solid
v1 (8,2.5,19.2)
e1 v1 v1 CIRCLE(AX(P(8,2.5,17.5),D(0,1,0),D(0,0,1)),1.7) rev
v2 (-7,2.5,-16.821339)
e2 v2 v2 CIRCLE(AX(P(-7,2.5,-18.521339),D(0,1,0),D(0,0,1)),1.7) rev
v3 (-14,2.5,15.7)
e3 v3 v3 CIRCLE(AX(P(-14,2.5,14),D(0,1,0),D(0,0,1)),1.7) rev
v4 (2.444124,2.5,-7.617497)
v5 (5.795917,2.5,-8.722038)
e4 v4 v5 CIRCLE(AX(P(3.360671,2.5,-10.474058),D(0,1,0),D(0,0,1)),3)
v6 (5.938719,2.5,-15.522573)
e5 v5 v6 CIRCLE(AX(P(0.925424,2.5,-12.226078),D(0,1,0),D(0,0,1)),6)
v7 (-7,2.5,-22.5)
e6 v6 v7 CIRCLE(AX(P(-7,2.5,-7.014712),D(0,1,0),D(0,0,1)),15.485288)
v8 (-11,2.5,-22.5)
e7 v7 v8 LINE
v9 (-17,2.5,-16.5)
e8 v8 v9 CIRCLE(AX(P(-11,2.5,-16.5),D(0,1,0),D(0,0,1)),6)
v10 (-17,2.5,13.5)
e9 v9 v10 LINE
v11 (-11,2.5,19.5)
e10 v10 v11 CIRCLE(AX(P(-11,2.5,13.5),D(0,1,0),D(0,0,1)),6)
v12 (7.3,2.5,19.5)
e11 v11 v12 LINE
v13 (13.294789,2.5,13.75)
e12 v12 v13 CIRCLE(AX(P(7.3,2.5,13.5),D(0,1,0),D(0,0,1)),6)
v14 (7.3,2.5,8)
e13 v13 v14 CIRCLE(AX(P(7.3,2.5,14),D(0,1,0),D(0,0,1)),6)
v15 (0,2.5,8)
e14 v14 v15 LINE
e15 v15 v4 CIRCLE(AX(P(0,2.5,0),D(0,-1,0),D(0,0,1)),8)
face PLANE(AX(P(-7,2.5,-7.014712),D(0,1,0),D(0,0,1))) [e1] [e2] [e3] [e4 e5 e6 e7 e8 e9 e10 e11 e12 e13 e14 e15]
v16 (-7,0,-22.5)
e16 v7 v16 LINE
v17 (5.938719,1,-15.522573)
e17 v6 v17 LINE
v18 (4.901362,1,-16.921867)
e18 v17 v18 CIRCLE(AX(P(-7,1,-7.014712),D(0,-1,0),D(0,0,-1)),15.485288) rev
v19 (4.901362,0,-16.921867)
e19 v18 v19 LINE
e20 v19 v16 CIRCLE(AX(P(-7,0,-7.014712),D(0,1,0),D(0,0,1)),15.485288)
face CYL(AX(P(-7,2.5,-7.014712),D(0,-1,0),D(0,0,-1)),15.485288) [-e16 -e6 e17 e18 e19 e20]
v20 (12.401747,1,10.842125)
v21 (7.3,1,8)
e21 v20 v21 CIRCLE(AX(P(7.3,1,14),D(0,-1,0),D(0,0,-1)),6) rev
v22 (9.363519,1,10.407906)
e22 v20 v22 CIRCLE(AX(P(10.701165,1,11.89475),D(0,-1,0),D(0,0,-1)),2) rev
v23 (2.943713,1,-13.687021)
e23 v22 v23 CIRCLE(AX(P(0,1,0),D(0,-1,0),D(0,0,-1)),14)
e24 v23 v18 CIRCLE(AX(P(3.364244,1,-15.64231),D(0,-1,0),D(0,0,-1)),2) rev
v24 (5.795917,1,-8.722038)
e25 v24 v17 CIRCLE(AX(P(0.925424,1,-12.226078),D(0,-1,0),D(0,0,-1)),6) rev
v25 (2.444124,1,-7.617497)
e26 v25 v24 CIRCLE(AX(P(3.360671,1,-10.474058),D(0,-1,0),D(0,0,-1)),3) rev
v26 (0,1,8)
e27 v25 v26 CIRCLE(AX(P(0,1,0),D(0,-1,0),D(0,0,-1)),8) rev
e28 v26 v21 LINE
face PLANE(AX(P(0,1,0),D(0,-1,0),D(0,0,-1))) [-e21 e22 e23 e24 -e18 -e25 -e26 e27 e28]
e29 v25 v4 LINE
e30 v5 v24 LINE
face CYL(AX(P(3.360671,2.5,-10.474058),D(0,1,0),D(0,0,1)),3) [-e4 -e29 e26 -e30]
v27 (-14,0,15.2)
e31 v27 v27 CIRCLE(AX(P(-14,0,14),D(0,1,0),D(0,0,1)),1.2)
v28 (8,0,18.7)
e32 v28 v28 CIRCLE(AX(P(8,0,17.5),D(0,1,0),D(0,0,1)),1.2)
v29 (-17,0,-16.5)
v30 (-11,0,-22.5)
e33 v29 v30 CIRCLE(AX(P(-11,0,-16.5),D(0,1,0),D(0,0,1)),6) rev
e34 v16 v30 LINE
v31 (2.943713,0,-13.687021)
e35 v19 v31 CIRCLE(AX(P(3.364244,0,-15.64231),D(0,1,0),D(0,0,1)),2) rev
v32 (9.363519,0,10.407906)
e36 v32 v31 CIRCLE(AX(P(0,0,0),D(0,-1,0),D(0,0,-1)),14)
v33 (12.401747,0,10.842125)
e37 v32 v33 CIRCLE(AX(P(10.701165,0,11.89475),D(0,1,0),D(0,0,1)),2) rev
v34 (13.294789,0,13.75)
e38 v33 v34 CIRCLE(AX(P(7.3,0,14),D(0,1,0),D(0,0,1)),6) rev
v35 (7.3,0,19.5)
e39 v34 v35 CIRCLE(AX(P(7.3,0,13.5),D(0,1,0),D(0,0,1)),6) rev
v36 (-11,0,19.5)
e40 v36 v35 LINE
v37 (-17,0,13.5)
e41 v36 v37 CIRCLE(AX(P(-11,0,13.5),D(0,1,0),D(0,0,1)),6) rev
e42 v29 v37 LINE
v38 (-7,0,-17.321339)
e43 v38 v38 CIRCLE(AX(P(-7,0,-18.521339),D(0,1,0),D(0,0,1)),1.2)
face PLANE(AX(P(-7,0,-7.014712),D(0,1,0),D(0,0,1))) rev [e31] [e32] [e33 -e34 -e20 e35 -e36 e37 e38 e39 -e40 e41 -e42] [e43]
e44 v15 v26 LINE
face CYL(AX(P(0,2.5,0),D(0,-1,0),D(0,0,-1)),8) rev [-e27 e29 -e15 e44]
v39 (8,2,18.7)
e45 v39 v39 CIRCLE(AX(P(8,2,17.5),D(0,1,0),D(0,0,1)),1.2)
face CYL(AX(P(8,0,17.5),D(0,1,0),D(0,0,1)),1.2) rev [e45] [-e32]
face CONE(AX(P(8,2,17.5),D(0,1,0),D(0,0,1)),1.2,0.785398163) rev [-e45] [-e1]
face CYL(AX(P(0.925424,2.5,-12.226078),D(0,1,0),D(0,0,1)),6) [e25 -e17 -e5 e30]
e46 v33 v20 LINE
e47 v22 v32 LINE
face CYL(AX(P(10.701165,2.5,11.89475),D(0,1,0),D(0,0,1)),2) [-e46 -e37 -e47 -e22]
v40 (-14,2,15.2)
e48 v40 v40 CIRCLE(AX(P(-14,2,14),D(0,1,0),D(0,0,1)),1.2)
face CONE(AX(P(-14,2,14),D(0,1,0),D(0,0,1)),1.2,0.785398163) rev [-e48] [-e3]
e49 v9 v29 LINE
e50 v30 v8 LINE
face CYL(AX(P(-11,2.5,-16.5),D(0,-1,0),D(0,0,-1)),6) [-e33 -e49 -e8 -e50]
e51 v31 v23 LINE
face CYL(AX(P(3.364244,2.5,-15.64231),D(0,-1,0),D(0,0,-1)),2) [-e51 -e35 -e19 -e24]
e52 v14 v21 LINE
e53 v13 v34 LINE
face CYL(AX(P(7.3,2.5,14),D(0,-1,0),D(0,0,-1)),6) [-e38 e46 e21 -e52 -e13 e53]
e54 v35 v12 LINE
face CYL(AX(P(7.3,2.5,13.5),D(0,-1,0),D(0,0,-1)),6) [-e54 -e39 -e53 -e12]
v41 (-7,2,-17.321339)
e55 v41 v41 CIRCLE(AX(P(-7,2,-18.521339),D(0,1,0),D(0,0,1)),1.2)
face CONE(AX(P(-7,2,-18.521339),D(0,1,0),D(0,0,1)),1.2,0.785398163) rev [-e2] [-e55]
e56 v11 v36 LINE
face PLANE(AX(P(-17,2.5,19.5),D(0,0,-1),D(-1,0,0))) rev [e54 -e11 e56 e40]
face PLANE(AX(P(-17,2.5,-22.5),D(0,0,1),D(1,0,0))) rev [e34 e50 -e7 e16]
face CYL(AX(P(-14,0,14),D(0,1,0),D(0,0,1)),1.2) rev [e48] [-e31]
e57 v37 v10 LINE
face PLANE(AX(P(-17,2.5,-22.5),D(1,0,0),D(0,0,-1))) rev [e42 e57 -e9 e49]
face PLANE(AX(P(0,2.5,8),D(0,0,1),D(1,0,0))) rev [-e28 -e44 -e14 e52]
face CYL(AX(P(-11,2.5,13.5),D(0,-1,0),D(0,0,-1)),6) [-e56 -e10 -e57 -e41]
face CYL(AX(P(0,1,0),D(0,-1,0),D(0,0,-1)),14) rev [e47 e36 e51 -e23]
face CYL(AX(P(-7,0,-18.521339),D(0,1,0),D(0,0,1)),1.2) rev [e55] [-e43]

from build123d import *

# Parameters (mm, degrees)
BOSS_EXTRU_1_DEPTH      = 2.5
ESQUISSE2_R             = 1.2
ENL_V_MAT_EXTRU_1_DEPTH = 29.310775334
CONG_1_R                = 6
CONG_3_R                = 3
ESQUISSE4_R             = 14
ENL_V_MAT_EXTRU_2_DEPTH = 1
CONG_5_R                = 2
CHANFREIN1_SIZE         = 0.5


with BuildPart() as part:
    # Esquisse1 → Boss.-Extru.1 (new body)
    with BuildSketch(Plane(origin=(0, 0, 0), x_dir=(1, 0, 0), z_dir=(0, 1, 0))):
        with BuildLine():
            Line((-17, 22.5), (-17, -19.5))
            Line((-17, -19.5), (13.3, -19.5))
            Line((13.3, -19.5), (13.3, -8))
            Line((13.3, -8), (0, -8))
            ThreePointArc((0, -8), (-7.745966692, 2), (3.872983346, 7))
            Line((3.872983346, 7), (8.485281374, 7))
            ThreePointArc((8.485281374, 7), (3.954952524, 17.959261462), (-7, 22.5))
            Line((-7, 22.5), (-17, 22.5))
        make_face()
    extrude(amount=BOSS_EXTRU_1_DEPTH)

    # Esquisse2 → Enlèv. mat.-Extru.1 (cut, through all)
    with BuildSketch(Plane(origin=(0, 2.5, 0), x_dir=(1, 0, 0), z_dir=(0, 1, 0))):
        with Locations(Location((-14, -14, 0), (0, 0, 270))):
            Circle(ESQUISSE2_R)
        with Locations(Location((-7, 18.521339044, 0), (0, 0, 270))):
            Circle(ESQUISSE2_R)
        with Locations(Location((8, -17.5, 0), (0, 0, 270))):
            Circle(ESQUISSE2_R)
    extrude(amount=-ENL_V_MAT_EXTRU_1_DEPTH, mode=Mode.SUBTRACT)

    # Congé1
    # the kernel refuses this fillet: 6 mm, written as the material it takes off along each edge
    with BuildSketch(Plane(origin=(-17, -15, -22.5), x_dir=(0, 0, 1), z_dir=(0, 1, 0))) as cong_1_piece_1:
        with BuildLine():
            CenterArc((CONG_1_R, CONG_1_R), CONG_1_R, 180, 90)
            Line((0, CONG_1_R), (-CONG_1_R * 0.02, CONG_1_R))
            Line((-CONG_1_R * 0.02, CONG_1_R), (-CONG_1_R * 0.02, -CONG_1_R * 0.02))
            Line((-CONG_1_R * 0.02, -CONG_1_R * 0.02), (CONG_1_R, -CONG_1_R * 0.02))
            Line((CONG_1_R, -CONG_1_R * 0.02), (CONG_1_R, 0))
        make_face()
    extrude(amount=32.5, mode=Mode.SUBTRACT)
    with BuildSketch(Plane(origin=(-17, -15, 19.5), x_dir=(0, 0, -1), z_dir=(0, 1, 0)), Plane(origin=(13.3, -15, 8), x_dir=(0, 0, 1), z_dir=(0, 1, 0)), Plane(origin=(13.3, -15, 19.5), x_dir=(-1, 0, 0), z_dir=(0, 1, 0))) as cong_1_piece_2:
        with BuildLine():
            CenterArc((CONG_1_R, -CONG_1_R), CONG_1_R, 90, 90)
            Line((0, -CONG_1_R), (-CONG_1_R * 0.02, -CONG_1_R))
            Line((-CONG_1_R * 0.02, -CONG_1_R), (-CONG_1_R * 0.02, CONG_1_R * 0.02))
            Line((-CONG_1_R * 0.02, CONG_1_R * 0.02), (CONG_1_R, CONG_1_R * 0.02))
            Line((CONG_1_R, CONG_1_R * 0.02), (CONG_1_R, 0))
        make_face()
    extrude(amount=32.5, mode=Mode.SUBTRACT)
    with BuildSketch(Plane(origin=(8.485281374, -22.237247638, -7), x_dir=(-0.2862946812834453, 0, -0.9581416155604611), z_dir=(0, 1, 0))) as cong_1_piece_3:
        with BuildLine():
            CenterArc((7.171670108, 5.747215151), CONG_1_R, 192.787166877, 93.903519848)
            Line((1.320476394, 4.419234684), (1.20345252, 4.392675075))
            ThreePointArc((1.20345252, 4.392675075), (0.545261203, 2.243972704), (-0.114976994, 0.034355362))
            Line((-0.114976994, 0.034355362), (-0.034464579, -0.114944303))
            ThreePointArc((-0.034464579, -0.114944303), (4.447449528, -0.772407713), (8.929363634, -0.114944303))
            Line((8.929363634, -0.114944303), (8.894899055, 0))
        make_face()
    extrude(amount=46.974495277, mode=Mode.SUBTRACT)

    # Congé3
    cong_3_edges = [part.edges().sort_by_distance(p)[0] for p in [
        (3.872983346, 1.25, -7),
    ]]
    fillet(cong_3_edges, radius=CONG_3_R)

    # Esquisse4 → Enlèv. mat.-Extru.2 (cut)
    with BuildSketch(Plane.XZ):
        Circle(ESQUISSE4_R)
    extrude(amount=-ENL_V_MAT_EXTRU_2_DEPTH, mode=Mode.SUBTRACT)

    # Congé5
    # the kernel refuses this fillet: 2 mm, written as the material it takes off along each edge
    with BuildSketch(Plane(origin=(10.685001077, 1, 9.046035153), x_dir=(-0.696384745978129, 0, 0.7176686460818646), z_dir=(0, -1, 0))) as cong_5_piece_1:
        with BuildLine():
            CenterArc((2.033177058, -1.995401593), CONG_5_R, 93.886060886, 100.219627186)
            ThreePointArc((0.093481407, -2.482824183), (-0.083183309, -1.246303892), (0, 0))
            ThreePointArc((0, 0), (0.94881596, -0.032188852), (1.897631921, 0))
        make_face()
    extrude(amount=7.211458513, mode=Mode.SUBTRACT)
    with BuildSketch(Plane(origin=(6.925136159, 1, -12.16727123), x_dir=(-0.39164389481893525, 0, -0.9201168728216296), z_dir=(0, -1, 0))) as cong_5_piece_2:
        with BuildLine():
            CenterArc((4.592043661, -1.915459486), CONG_5_R, 73.281516472, 141.913205532)
            Line((2.957647671, -3.068173565), (2.794208072, -3.183444973))
            ThreePointArc((2.794208072, -3.183444973), (1.45226122, -1.559692524), (-0.121187489, -0.159102459))
            Line((-0.121187489, -0.159102459), (-0.080128667, 0.183246819))
            ThreePointArc((-0.080128667, 0.183246819), (3.50925175, 0.603260074), (5.224916554, 0.191545949))
            Line((5.224916554, 0.191545949), (5.167382655, 0))
        make_face()
    extrude(amount=13.918456637, mode=Mode.SUBTRACT)

    # Chanfrein1
    chanfrein1_edges = [part.edges().sort_by_distance(p)[0] for p in [
        (-14, 2.5, 12.8),
        (-7, 2.5, -19.721339044),
        (8, 2.5, 16.3),
    ]]
    chamfer(chanfrein1_edges, length=CHANFREIN1_SIZE)


solid = part.part
